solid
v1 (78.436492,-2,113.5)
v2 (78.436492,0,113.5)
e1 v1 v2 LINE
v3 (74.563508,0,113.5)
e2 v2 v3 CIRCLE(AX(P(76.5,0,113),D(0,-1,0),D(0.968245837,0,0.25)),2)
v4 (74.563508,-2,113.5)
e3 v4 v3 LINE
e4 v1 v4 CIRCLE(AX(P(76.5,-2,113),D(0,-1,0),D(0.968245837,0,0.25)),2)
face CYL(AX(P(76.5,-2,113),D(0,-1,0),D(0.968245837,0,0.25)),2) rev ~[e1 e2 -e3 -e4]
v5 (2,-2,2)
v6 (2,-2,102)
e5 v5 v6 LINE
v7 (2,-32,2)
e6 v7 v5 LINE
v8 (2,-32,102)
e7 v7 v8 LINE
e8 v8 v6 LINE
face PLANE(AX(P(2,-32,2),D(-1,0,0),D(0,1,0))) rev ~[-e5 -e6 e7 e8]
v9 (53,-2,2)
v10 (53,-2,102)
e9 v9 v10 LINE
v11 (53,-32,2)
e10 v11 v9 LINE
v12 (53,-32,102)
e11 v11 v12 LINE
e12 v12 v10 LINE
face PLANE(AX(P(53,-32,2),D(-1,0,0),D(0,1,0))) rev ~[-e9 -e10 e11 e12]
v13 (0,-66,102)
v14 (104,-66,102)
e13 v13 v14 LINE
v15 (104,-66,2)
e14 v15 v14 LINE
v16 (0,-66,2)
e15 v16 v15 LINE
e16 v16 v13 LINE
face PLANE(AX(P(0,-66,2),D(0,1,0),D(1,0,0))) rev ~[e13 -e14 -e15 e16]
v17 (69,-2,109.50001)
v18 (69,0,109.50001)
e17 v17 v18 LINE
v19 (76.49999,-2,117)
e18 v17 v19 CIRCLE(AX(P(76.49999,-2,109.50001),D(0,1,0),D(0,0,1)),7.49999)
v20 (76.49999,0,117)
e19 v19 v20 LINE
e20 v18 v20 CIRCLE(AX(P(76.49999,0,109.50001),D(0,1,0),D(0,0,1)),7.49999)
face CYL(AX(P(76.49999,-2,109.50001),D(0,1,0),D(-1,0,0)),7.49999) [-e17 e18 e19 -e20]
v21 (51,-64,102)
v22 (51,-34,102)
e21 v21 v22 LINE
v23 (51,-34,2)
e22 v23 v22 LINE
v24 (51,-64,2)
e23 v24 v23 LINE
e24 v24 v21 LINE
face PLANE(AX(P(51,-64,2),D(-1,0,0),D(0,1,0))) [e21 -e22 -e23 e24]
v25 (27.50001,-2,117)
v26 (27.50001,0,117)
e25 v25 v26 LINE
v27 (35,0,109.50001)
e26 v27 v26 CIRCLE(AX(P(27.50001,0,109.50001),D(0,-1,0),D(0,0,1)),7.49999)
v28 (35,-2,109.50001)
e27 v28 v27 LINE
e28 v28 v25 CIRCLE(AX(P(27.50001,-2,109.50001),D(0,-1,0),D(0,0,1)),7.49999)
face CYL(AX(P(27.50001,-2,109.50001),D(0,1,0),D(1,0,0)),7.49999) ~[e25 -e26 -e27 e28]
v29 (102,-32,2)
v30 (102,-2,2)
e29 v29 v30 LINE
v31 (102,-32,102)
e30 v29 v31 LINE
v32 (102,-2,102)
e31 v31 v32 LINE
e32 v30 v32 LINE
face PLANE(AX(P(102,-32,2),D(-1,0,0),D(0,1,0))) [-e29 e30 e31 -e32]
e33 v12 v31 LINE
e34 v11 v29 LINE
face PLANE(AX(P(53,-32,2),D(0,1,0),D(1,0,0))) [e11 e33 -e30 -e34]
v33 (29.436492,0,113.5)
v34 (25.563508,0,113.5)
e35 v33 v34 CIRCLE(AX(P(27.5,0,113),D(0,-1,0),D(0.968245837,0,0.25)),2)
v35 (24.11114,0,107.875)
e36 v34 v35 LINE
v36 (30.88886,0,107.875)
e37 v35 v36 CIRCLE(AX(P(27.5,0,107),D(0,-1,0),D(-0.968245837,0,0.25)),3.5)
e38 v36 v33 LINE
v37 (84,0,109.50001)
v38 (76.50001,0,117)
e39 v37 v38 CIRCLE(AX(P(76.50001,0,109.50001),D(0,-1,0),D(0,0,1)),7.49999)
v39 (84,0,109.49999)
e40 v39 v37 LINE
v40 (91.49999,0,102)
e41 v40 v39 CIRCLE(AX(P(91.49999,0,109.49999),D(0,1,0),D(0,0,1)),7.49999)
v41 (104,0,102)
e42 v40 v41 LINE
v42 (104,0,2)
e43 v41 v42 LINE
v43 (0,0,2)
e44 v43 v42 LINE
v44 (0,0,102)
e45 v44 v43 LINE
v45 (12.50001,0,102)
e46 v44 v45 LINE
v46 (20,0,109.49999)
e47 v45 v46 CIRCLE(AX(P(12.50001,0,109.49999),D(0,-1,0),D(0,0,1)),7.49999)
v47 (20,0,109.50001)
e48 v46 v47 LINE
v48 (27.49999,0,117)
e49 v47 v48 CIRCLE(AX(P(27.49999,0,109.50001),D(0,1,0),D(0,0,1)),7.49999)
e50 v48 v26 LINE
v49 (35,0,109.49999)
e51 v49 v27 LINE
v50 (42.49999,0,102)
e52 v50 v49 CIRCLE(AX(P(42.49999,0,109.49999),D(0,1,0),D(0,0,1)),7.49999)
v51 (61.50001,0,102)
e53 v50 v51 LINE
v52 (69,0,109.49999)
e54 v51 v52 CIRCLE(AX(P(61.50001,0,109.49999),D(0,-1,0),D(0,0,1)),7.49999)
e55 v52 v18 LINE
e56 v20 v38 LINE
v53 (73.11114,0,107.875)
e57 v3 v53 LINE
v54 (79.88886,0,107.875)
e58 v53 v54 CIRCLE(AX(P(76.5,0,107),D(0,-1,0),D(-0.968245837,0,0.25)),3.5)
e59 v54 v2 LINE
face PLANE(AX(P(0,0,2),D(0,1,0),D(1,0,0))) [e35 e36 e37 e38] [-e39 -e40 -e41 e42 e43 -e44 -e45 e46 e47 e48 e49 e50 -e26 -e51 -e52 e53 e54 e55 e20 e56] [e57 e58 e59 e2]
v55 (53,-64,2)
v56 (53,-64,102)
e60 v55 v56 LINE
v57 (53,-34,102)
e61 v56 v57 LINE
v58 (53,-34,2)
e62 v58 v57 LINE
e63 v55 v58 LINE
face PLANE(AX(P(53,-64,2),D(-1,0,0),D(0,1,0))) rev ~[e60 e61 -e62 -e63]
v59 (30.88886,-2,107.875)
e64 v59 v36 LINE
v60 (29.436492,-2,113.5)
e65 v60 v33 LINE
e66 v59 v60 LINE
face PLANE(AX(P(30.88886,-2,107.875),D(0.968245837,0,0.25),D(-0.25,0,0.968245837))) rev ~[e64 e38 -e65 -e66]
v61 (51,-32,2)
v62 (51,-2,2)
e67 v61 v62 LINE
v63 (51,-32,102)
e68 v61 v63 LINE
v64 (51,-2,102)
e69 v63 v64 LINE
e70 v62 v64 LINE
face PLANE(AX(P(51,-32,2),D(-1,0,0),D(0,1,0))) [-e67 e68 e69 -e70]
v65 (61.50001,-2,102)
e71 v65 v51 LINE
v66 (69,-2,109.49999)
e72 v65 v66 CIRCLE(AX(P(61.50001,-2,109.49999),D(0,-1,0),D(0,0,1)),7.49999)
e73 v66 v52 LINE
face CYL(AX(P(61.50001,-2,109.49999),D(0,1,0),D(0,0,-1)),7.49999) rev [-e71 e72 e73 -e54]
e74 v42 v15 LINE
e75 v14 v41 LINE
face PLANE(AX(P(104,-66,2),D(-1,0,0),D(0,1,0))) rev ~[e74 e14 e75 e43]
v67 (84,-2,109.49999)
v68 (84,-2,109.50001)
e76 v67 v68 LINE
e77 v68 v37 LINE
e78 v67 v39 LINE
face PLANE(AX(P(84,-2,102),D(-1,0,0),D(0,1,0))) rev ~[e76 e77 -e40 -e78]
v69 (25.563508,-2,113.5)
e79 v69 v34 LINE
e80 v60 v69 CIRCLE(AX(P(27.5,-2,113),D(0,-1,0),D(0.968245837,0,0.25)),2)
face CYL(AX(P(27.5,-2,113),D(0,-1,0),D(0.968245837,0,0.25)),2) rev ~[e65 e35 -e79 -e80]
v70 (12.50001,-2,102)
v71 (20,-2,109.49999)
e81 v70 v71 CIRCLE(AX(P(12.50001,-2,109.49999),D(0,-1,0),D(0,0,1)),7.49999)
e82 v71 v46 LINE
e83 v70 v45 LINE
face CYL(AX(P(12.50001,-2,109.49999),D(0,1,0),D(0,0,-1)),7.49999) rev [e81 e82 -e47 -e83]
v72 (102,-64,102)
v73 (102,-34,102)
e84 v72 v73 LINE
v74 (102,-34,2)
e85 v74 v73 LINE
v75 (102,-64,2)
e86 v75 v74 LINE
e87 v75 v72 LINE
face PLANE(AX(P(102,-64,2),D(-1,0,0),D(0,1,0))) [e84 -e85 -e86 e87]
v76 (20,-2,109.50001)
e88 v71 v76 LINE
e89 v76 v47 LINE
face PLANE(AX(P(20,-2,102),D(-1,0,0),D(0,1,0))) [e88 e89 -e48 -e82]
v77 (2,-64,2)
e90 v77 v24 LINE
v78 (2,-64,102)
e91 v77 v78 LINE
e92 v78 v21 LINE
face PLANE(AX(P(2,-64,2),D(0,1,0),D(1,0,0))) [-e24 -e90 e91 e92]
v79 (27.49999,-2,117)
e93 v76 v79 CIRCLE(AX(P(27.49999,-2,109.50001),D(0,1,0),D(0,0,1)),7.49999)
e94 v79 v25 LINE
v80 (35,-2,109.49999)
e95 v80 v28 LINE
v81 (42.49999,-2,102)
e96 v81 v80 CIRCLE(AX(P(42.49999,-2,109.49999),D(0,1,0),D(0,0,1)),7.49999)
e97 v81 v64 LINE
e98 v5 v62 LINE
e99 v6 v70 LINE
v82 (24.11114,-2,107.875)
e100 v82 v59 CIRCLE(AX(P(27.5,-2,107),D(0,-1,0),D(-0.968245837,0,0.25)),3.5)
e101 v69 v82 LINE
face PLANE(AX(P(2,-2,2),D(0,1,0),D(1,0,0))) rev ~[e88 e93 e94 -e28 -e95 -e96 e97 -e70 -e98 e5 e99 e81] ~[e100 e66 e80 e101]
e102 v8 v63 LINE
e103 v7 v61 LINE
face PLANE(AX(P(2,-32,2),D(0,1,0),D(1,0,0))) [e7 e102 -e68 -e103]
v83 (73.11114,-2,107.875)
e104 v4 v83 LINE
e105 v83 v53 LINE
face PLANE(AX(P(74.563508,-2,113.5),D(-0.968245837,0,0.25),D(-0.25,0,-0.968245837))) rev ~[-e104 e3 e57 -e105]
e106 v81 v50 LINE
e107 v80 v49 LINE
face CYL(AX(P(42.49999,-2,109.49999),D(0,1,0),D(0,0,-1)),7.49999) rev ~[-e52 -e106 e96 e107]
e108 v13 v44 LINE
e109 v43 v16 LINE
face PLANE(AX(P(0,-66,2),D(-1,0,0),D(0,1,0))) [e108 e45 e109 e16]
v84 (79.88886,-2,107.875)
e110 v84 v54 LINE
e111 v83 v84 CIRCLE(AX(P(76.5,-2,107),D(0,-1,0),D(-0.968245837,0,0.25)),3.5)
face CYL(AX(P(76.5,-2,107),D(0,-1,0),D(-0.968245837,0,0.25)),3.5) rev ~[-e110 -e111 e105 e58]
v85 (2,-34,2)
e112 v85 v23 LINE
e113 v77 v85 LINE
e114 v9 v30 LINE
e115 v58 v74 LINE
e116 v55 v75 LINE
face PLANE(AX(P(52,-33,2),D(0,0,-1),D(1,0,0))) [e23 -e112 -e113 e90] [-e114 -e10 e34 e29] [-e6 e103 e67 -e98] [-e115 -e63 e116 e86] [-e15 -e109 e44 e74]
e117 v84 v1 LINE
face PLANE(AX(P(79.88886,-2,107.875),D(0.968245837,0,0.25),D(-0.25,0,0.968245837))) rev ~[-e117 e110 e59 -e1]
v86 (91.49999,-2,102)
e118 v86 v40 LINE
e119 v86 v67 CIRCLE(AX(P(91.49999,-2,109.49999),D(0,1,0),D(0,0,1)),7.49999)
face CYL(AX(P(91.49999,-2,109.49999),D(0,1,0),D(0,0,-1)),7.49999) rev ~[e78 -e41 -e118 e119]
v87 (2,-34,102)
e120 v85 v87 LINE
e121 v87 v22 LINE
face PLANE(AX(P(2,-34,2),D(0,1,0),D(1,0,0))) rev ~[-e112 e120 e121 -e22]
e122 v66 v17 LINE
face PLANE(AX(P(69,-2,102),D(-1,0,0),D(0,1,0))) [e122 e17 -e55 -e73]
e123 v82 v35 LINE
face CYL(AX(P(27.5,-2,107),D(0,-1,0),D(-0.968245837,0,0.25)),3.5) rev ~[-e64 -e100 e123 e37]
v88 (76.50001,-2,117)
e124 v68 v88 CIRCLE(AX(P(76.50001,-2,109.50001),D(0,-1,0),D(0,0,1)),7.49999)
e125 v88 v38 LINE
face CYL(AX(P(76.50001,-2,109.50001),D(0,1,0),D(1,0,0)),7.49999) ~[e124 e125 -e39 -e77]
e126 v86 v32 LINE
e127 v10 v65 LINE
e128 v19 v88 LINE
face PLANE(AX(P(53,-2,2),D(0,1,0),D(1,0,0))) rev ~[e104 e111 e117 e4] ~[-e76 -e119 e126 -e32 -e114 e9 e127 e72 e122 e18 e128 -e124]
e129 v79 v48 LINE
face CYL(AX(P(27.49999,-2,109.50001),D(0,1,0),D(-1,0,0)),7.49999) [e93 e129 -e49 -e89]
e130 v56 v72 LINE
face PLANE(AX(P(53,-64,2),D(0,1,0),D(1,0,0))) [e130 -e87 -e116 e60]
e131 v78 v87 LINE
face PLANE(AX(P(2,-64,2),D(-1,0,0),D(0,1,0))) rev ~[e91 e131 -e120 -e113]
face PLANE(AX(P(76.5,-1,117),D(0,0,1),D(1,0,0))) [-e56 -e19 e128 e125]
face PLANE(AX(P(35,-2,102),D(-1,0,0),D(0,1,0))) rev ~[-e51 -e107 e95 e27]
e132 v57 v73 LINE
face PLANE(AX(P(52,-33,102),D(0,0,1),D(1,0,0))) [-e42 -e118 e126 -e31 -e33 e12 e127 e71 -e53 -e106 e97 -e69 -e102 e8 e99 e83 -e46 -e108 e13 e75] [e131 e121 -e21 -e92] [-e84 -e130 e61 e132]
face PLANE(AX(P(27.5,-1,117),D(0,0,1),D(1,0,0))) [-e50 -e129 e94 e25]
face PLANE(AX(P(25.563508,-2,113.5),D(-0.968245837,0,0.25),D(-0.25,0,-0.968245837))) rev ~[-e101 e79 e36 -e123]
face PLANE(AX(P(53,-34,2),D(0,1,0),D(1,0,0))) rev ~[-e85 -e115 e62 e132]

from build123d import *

# Parameters (mm, degrees)
F1_DEPTH  = 2
F2_W      = 104
F2_H      = 66
F2_W_2    = 49
F2_H_2    = 30
F3_DEPTH  = 100
F4_W      = 15
F4_H      = 2
F5_DEPTH  = 15
F7_DEPTH  = 2
F8_R      = 7.49999
F9_W      = 104
F9_H      = 66
F10_DEPTH = 2


# Not quite as in the source:
# - a fillet or chamfer is up to 0.001 mm smaller than in the source, because OpenCascade refuses the exact size


with BuildPart() as f1:
    # F0 (on Top) → F1 (new body)
    with BuildSketch(Plane.XY):
        Polygon((104, 0), (0, 0), (0, -34), (0, -66), (104, -66), (104, -34), align=None)
    extrude(amount=F1_DEPTH)

    # F2 (on face) → F3 (join)
    with BuildSketch(Plane.XY.offset(2)):
        with Locations((52, -33)):
            Rectangle(F2_W, F2_H)
        with Locations((26.5, -49)):
            Rectangle(F2_W_2, F2_H_2, mode=Mode.SUBTRACT)
        with Locations((77.5, -49)):
            Rectangle(F2_W_2, F2_H_2, mode=Mode.SUBTRACT)
        with Locations((26.5, -17)):
            Rectangle(F2_W_2, F2_H_2, mode=Mode.SUBTRACT)
        with Locations((77.5, -17)):
            Rectangle(F2_W_2, F2_H_2, mode=Mode.SUBTRACT)
    extrude(amount=F3_DEPTH)

    # F4 (on face) → F5 (join)
    with BuildSketch(Plane.XY.offset(102)):
        with Locations((27.5, -1)):
            Rectangle(F4_W, F4_H)
        with Locations((76.5, -1)):
            Rectangle(F4_W, F4_H)
    extrude(amount=F5_DEPTH)

    # F6 (on face) → F7 (cut, through all)
    with BuildSketch(Plane.XZ.offset(2)):
        with BuildLine():
            Line((79.8888604279, 107.875), (78.4364916731, 113.5))
            ThreePointArc((78.4364916731, 113.5), (76.5, 115), (74.5635083269, 113.5))
            Line((74.5635083269, 113.5), (73.1111395721, 107.875))
            ThreePointArc((73.1111395721, 107.875), (76.5, 103.5), (79.8888604279, 107.875))
        make_face()
        with BuildLine():
            Line((30.8888604279, 107.875), (29.4364916731, 113.5))
            ThreePointArc((29.4364916731, 113.5), (27.5, 115), (25.5635083269, 113.5))
            Line((25.5635083269, 113.5), (24.1111395721, 107.875))
            ThreePointArc((24.1111395721, 107.875), (27.5, 103.5), (30.8888604279, 107.875))
        make_face()
    extrude(amount=-F7_DEPTH, mode=Mode.SUBTRACT)

    # F8 (radius 7.5 in the source; OpenCascade refuses exactly that, so slightly less here)
    f8_edges = [f1.edges().sort_by_distance(p)[0] for p in [
        (84, -1, 102),
        (84, -1, 117),
        (69, -1, 117),
        (69, -1, 102),
        (35, -1, 102),
        (35, -1, 117),
        (20, -1, 117),
        (20, -1, 102),
    ]]
    fillet(f8_edges, radius=F8_R)

    # F9 (on face) → F10 (cut)
    with BuildSketch(Plane(origin=(0, 0, 0), x_dir=(1, 0, 0), z_dir=(0, 0, -1))):
        with Locations((52, 33)):
            Rectangle(F9_W, F9_H)
    extrude(amount=-F10_DEPTH, mode=Mode.SUBTRACT)


solid = f1.part
